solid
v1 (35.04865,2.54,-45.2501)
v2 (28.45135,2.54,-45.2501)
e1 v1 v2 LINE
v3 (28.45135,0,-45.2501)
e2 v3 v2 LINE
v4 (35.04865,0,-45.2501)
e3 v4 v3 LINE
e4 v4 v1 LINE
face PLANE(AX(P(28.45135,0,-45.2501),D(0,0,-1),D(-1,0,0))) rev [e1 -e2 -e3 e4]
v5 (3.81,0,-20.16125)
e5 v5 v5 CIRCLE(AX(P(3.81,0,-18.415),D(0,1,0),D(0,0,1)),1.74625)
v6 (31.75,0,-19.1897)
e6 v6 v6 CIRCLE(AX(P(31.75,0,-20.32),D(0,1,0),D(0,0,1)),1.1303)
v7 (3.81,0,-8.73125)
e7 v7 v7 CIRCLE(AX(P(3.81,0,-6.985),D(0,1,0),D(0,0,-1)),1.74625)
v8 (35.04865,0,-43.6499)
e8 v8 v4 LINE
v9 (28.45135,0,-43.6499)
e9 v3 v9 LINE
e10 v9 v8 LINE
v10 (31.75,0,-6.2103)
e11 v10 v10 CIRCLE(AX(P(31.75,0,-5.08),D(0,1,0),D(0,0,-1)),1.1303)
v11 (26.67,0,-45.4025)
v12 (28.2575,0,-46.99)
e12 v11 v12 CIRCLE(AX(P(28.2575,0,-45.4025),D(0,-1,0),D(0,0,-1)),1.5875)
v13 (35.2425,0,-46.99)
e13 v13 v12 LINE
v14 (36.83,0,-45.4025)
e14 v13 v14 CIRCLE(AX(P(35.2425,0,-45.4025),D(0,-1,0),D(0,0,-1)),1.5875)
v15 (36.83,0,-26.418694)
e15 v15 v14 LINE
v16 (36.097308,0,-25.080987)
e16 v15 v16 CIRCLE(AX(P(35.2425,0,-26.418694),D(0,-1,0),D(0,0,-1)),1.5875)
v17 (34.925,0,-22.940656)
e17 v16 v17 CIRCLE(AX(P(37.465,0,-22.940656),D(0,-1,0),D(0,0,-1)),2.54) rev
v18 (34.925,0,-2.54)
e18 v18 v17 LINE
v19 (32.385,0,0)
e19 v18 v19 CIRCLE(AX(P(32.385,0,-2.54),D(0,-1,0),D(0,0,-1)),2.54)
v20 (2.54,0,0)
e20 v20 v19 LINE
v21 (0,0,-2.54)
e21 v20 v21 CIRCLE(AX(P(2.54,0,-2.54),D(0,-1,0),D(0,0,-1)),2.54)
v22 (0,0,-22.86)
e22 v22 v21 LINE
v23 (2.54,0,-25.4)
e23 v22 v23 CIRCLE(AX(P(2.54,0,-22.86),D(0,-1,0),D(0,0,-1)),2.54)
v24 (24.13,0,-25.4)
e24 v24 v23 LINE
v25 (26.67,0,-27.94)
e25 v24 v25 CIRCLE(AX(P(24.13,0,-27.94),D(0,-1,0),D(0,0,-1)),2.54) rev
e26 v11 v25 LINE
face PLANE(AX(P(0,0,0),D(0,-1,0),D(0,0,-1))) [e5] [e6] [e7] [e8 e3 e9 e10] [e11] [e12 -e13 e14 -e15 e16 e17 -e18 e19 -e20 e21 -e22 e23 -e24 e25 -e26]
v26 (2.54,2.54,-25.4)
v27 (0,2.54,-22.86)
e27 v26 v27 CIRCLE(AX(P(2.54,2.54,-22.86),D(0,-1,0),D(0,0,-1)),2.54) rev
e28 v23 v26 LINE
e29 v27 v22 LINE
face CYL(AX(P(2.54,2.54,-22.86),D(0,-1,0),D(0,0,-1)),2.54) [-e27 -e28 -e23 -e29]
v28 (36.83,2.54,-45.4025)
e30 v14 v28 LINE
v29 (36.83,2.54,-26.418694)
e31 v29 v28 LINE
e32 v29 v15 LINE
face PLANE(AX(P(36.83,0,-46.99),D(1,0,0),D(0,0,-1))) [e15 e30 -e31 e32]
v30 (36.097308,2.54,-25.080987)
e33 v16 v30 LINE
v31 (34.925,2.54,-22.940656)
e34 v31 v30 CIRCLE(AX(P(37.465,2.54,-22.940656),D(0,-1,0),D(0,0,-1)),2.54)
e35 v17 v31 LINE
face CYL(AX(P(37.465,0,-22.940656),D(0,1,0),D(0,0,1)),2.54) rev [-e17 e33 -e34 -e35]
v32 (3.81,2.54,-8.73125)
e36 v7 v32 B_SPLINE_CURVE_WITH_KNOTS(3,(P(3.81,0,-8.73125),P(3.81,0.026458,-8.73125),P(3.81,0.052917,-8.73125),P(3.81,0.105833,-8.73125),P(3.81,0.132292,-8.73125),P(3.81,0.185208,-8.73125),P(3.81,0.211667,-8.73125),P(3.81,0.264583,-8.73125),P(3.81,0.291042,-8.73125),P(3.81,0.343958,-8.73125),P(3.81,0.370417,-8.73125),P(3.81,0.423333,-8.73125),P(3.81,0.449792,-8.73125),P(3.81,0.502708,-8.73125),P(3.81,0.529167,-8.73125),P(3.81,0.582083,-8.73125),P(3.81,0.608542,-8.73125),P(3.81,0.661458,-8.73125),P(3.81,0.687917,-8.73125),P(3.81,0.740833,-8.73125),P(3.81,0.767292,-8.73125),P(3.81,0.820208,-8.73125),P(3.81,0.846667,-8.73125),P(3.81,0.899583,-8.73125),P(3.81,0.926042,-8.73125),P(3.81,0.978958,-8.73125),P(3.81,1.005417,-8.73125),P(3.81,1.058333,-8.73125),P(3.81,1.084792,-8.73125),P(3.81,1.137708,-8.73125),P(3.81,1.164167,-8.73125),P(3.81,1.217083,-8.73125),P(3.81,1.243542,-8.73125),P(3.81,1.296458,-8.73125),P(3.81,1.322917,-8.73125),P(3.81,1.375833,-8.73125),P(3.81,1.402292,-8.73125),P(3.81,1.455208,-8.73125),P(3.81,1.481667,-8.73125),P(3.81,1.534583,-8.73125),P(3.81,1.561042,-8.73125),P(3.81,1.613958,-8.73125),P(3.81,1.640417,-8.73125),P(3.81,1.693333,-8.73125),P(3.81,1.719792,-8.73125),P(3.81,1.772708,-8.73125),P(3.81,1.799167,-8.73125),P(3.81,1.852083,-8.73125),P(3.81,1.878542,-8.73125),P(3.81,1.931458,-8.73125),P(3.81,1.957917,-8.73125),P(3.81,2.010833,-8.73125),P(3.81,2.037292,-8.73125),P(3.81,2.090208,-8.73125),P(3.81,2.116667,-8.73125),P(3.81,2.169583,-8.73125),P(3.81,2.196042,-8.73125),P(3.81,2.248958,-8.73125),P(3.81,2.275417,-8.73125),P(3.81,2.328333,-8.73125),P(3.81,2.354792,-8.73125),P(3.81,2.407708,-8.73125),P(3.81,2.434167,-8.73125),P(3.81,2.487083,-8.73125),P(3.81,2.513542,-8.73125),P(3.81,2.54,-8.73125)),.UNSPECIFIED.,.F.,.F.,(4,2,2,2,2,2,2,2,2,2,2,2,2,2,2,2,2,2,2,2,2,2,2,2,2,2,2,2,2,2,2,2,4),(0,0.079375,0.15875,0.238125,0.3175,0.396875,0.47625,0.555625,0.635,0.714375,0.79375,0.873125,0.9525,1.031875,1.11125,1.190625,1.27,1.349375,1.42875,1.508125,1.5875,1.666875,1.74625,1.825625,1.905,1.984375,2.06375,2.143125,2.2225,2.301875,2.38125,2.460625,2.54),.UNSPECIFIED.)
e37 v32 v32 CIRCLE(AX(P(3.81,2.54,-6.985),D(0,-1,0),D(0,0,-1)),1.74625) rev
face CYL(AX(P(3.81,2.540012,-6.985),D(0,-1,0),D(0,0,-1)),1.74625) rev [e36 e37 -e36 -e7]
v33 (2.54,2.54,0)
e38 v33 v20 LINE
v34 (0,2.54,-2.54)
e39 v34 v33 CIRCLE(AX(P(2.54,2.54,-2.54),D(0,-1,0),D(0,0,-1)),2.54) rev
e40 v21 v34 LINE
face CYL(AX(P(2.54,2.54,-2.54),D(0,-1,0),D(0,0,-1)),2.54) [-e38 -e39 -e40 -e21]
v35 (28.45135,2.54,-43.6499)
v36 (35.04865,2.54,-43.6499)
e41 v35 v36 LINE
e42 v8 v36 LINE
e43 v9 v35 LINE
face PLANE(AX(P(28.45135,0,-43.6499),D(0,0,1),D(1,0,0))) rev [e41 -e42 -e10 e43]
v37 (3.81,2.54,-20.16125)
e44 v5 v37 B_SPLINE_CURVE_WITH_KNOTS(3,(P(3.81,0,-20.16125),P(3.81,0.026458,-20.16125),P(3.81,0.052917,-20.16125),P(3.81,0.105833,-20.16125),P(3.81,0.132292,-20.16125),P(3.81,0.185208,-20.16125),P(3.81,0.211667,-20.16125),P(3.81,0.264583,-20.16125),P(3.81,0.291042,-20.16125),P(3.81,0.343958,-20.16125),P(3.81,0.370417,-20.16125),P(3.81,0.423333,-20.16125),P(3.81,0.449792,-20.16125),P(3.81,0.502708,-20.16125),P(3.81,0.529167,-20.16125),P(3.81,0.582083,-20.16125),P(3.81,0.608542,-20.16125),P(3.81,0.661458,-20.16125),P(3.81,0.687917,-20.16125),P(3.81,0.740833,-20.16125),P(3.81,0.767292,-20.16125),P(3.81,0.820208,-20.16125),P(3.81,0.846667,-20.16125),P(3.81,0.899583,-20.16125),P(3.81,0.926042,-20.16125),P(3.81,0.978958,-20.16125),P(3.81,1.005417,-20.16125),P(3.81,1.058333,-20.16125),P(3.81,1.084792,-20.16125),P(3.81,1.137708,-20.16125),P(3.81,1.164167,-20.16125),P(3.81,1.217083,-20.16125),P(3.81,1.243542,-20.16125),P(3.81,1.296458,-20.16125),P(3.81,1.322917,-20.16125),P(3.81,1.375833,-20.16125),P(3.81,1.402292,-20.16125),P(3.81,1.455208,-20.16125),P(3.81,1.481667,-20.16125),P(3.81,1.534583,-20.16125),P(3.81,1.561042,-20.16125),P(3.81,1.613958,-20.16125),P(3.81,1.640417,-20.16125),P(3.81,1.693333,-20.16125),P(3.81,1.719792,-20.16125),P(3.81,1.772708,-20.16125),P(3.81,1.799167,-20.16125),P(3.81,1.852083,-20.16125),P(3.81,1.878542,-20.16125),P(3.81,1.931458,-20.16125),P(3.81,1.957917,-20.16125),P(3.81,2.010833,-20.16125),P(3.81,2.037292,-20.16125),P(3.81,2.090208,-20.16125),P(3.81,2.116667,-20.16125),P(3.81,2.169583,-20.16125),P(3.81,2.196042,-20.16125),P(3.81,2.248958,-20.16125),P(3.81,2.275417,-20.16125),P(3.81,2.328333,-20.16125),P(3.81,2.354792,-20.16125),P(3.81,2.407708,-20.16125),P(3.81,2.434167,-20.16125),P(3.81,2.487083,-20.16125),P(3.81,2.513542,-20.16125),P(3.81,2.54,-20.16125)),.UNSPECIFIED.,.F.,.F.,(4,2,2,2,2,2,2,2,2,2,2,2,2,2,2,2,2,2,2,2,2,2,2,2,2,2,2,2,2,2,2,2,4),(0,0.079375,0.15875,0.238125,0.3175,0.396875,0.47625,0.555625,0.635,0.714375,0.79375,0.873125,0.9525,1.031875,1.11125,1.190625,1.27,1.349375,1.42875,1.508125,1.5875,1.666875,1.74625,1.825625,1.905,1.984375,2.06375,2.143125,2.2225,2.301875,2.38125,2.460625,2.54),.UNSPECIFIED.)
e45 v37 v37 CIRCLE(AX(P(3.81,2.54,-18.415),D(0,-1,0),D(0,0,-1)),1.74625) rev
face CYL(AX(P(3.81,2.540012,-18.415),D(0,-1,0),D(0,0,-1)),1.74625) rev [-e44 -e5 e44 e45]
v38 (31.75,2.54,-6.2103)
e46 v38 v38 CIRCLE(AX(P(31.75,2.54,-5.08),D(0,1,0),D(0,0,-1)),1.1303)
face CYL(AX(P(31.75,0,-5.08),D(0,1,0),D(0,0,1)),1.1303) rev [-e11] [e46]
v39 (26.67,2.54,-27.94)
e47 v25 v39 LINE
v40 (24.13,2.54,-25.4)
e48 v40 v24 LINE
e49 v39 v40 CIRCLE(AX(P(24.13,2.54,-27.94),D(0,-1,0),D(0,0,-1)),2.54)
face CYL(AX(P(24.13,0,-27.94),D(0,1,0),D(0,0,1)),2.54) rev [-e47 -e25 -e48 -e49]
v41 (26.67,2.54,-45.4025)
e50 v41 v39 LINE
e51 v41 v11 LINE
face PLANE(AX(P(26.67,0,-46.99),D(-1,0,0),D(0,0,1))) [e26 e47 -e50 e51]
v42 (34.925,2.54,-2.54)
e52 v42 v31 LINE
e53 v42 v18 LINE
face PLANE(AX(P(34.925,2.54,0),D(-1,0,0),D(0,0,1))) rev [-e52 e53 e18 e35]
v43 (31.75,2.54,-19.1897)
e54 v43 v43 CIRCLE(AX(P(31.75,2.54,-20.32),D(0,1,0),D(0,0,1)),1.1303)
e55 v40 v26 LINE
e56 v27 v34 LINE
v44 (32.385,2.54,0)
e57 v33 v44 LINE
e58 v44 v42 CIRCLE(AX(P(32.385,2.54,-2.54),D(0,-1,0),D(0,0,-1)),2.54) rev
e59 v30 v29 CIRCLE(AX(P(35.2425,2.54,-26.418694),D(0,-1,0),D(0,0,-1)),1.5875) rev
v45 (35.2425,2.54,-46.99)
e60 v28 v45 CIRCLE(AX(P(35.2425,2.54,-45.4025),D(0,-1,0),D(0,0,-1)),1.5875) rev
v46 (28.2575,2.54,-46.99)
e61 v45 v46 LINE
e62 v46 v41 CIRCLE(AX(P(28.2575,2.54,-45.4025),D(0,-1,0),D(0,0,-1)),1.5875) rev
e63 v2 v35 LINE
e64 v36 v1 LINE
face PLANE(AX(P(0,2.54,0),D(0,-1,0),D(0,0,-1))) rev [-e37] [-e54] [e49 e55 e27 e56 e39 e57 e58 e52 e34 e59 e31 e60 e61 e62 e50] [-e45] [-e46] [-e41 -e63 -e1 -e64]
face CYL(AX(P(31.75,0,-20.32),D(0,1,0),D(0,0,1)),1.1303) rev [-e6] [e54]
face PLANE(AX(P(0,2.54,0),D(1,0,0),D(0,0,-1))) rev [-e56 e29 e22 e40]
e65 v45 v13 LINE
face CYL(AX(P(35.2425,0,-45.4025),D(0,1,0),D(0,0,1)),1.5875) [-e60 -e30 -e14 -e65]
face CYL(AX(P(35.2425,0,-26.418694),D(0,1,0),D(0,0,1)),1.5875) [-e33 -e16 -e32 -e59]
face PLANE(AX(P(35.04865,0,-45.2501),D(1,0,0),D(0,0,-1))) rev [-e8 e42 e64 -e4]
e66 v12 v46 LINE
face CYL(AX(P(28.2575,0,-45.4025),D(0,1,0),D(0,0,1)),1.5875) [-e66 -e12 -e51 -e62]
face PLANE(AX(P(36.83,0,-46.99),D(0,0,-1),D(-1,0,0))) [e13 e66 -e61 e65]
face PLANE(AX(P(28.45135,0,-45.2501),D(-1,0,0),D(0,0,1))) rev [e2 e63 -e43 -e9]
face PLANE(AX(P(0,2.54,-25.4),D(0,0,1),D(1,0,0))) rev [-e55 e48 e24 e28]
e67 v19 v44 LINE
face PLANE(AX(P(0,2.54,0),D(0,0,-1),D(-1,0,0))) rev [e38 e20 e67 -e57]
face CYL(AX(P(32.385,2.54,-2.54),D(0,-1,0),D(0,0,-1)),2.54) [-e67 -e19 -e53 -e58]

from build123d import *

# Parameters (mm, degrees)
SKETCH1_W               = 34.925
SKETCH1_H               = 25.4
BOSS_EXTRUDE1_DEPTH     = 2.54
CUT_EXTRUDE3_DEPTH      = 44.259302179
CUT_EXTRUDE3_DEPTH_BACK = 44.259302179
SKETCH2_R               = 1.74625
SKETCH5_R               = 1.1303
CUT_EXTRUDE4_DEPTH      = 44.259302179
SKETCH6_W               = 10.16
SKETCH6_H               = 21.59
BOSS_EXTRUDE2_DEPTH     = 2.54
FILLET1_R               = 2.54
FILLET2_R               = 1.5875
FILLET3_R               = 2.54
SKETCH8_W               = 6.597299276
SKETCH8_H               = 1.6002
CUT_EXTRUDE6_DEPTH      = 2.54


with BuildPart() as part:
    # Sketch1 → Boss-Extrude1 (new body)
    with BuildSketch(Plane(origin=(0, 0, 0), x_dir=(1, 0, 0), z_dir=(0, 1, 0))):
        with Locations((17.4625, 12.7)):
            Rectangle(SKETCH1_W, SKETCH1_H)
    extrude(amount=BOSS_EXTRUDE1_DEPTH)

    # Sketch2 → Cut-Extrude3 (cut, two sides: drawn at the far end of the back side and taken through both)
    with BuildSketch(Plane(origin=(0, 2.54, 0), x_dir=(1, 0, 0), z_dir=(0, 1, 0)).offset(-CUT_EXTRUDE3_DEPTH_BACK)):
        with Locations(Location((3.81, 18.415, 0), (0, 0, 90))):
            Circle(SKETCH2_R)
        with Locations(Location((3.81, 6.985, 0), (0, 0, 90))):
            Circle(SKETCH2_R)
    extrude(amount=CUT_EXTRUDE3_DEPTH + CUT_EXTRUDE3_DEPTH_BACK, mode=Mode.SUBTRACT)

    # Sketch5 → Cut-Extrude4 (cut, through all)
    with BuildSketch(Plane(origin=(0, 2.54, 0), x_dir=(1, 0, 0), z_dir=(0, 1, 0))):
        with Locations(Location((31.75, 20.32, 0), (0, 0, 270))):
            Circle(SKETCH5_R)
        with Locations(Location((31.75, 5.08, 0), (0, 0, 90))):
            Circle(SKETCH5_R)
    extrude(amount=-CUT_EXTRUDE4_DEPTH, mode=Mode.SUBTRACT)

    # Sketch6 → Boss-Extrude2 (add)
    with BuildSketch(Plane(origin=(0, 2.54, 0), x_dir=(1, 0, 0), z_dir=(0, 1, 0))):
        with Locations((31.75, 36.195)):
            Rectangle(SKETCH6_W, SKETCH6_H)
    extrude(amount=-BOSS_EXTRUDE2_DEPTH)

    # Fillet1
    # the kernel refuses this fillet: 2.54 mm, written as the material it adds along each edge
    with BuildSketch(Plane(origin=(26.67, 2.54, -25.4), x_dir=(-1, 0, 0), z_dir=(0, -1, 0))) as fillet1_piece_1:
        with BuildLine():
            CenterArc((FILLET1_R, FILLET1_R), FILLET1_R, 180, 90)
            Line((0, FILLET1_R), (-FILLET1_R * 0.02, FILLET1_R))
            Line((-FILLET1_R * 0.02, FILLET1_R), (-FILLET1_R * 0.02, -FILLET1_R * 0.02))
            Line((-FILLET1_R * 0.02, -FILLET1_R * 0.02), (FILLET1_R, -FILLET1_R * 0.02))
            Line((FILLET1_R, -FILLET1_R * 0.02), (FILLET1_R, 0))
        make_face()
    extrude(amount=2.54)
    with BuildSketch(Plane(origin=(34.925, 0, -25.4), x_dir=(0, 0, 1), z_dir=(0, 1, 0))) as fillet1_piece_2:
        with BuildLine():
            CenterArc((2.459344425, 2.54), FILLET1_R, 194.477512186, 75.522487814)
            Line((0, 1.905), (-0.049186888, 1.8923))
            ThreePointArc((-0.049186888, 1.8923), (-0.0508, 0.9525), (-0.0508, 0))
            Line((-0.0508, 0), (0, -0.0508))
            Line((0, -0.0508), (2.459344425, -0.0508))
            Line((2.459344425, -0.0508), (2.459344425, 0))
        make_face()
    extrude(amount=2.54)

    # Fillet2
    fillet2_edges = [part.edges().sort_by_distance(p)[0] for p in [
        (26.67, 1.27, -46.99),
        (36.83, 1.27, -46.99),
        (36.83, 1.27, -25.4),
    ]]
    fillet(fillet2_edges, radius=FILLET2_R)

    # Fillet3
    fillet3_edges = [part.edges().sort_by_distance(p)[0] for p in [
        (0, 1.27, -25.4),
        (34.925, 1.27, 0),
        (0, 1.27, 0),
    ]]
    fillet(fillet3_edges, radius=FILLET3_R)

    # Sketch8 → Cut-Extrude6 (cut)
    with BuildSketch(Plane(origin=(0, 2.54, 0), x_dir=(1, 0, 0), z_dir=(0, 1, 0))):
        with Locations((31.75, 44.45)):
            Rectangle(SKETCH8_W, SKETCH8_H)
    extrude(amount=-CUT_EXTRUDE6_DEPTH, mode=Mode.SUBTRACT)


solid = part.part
